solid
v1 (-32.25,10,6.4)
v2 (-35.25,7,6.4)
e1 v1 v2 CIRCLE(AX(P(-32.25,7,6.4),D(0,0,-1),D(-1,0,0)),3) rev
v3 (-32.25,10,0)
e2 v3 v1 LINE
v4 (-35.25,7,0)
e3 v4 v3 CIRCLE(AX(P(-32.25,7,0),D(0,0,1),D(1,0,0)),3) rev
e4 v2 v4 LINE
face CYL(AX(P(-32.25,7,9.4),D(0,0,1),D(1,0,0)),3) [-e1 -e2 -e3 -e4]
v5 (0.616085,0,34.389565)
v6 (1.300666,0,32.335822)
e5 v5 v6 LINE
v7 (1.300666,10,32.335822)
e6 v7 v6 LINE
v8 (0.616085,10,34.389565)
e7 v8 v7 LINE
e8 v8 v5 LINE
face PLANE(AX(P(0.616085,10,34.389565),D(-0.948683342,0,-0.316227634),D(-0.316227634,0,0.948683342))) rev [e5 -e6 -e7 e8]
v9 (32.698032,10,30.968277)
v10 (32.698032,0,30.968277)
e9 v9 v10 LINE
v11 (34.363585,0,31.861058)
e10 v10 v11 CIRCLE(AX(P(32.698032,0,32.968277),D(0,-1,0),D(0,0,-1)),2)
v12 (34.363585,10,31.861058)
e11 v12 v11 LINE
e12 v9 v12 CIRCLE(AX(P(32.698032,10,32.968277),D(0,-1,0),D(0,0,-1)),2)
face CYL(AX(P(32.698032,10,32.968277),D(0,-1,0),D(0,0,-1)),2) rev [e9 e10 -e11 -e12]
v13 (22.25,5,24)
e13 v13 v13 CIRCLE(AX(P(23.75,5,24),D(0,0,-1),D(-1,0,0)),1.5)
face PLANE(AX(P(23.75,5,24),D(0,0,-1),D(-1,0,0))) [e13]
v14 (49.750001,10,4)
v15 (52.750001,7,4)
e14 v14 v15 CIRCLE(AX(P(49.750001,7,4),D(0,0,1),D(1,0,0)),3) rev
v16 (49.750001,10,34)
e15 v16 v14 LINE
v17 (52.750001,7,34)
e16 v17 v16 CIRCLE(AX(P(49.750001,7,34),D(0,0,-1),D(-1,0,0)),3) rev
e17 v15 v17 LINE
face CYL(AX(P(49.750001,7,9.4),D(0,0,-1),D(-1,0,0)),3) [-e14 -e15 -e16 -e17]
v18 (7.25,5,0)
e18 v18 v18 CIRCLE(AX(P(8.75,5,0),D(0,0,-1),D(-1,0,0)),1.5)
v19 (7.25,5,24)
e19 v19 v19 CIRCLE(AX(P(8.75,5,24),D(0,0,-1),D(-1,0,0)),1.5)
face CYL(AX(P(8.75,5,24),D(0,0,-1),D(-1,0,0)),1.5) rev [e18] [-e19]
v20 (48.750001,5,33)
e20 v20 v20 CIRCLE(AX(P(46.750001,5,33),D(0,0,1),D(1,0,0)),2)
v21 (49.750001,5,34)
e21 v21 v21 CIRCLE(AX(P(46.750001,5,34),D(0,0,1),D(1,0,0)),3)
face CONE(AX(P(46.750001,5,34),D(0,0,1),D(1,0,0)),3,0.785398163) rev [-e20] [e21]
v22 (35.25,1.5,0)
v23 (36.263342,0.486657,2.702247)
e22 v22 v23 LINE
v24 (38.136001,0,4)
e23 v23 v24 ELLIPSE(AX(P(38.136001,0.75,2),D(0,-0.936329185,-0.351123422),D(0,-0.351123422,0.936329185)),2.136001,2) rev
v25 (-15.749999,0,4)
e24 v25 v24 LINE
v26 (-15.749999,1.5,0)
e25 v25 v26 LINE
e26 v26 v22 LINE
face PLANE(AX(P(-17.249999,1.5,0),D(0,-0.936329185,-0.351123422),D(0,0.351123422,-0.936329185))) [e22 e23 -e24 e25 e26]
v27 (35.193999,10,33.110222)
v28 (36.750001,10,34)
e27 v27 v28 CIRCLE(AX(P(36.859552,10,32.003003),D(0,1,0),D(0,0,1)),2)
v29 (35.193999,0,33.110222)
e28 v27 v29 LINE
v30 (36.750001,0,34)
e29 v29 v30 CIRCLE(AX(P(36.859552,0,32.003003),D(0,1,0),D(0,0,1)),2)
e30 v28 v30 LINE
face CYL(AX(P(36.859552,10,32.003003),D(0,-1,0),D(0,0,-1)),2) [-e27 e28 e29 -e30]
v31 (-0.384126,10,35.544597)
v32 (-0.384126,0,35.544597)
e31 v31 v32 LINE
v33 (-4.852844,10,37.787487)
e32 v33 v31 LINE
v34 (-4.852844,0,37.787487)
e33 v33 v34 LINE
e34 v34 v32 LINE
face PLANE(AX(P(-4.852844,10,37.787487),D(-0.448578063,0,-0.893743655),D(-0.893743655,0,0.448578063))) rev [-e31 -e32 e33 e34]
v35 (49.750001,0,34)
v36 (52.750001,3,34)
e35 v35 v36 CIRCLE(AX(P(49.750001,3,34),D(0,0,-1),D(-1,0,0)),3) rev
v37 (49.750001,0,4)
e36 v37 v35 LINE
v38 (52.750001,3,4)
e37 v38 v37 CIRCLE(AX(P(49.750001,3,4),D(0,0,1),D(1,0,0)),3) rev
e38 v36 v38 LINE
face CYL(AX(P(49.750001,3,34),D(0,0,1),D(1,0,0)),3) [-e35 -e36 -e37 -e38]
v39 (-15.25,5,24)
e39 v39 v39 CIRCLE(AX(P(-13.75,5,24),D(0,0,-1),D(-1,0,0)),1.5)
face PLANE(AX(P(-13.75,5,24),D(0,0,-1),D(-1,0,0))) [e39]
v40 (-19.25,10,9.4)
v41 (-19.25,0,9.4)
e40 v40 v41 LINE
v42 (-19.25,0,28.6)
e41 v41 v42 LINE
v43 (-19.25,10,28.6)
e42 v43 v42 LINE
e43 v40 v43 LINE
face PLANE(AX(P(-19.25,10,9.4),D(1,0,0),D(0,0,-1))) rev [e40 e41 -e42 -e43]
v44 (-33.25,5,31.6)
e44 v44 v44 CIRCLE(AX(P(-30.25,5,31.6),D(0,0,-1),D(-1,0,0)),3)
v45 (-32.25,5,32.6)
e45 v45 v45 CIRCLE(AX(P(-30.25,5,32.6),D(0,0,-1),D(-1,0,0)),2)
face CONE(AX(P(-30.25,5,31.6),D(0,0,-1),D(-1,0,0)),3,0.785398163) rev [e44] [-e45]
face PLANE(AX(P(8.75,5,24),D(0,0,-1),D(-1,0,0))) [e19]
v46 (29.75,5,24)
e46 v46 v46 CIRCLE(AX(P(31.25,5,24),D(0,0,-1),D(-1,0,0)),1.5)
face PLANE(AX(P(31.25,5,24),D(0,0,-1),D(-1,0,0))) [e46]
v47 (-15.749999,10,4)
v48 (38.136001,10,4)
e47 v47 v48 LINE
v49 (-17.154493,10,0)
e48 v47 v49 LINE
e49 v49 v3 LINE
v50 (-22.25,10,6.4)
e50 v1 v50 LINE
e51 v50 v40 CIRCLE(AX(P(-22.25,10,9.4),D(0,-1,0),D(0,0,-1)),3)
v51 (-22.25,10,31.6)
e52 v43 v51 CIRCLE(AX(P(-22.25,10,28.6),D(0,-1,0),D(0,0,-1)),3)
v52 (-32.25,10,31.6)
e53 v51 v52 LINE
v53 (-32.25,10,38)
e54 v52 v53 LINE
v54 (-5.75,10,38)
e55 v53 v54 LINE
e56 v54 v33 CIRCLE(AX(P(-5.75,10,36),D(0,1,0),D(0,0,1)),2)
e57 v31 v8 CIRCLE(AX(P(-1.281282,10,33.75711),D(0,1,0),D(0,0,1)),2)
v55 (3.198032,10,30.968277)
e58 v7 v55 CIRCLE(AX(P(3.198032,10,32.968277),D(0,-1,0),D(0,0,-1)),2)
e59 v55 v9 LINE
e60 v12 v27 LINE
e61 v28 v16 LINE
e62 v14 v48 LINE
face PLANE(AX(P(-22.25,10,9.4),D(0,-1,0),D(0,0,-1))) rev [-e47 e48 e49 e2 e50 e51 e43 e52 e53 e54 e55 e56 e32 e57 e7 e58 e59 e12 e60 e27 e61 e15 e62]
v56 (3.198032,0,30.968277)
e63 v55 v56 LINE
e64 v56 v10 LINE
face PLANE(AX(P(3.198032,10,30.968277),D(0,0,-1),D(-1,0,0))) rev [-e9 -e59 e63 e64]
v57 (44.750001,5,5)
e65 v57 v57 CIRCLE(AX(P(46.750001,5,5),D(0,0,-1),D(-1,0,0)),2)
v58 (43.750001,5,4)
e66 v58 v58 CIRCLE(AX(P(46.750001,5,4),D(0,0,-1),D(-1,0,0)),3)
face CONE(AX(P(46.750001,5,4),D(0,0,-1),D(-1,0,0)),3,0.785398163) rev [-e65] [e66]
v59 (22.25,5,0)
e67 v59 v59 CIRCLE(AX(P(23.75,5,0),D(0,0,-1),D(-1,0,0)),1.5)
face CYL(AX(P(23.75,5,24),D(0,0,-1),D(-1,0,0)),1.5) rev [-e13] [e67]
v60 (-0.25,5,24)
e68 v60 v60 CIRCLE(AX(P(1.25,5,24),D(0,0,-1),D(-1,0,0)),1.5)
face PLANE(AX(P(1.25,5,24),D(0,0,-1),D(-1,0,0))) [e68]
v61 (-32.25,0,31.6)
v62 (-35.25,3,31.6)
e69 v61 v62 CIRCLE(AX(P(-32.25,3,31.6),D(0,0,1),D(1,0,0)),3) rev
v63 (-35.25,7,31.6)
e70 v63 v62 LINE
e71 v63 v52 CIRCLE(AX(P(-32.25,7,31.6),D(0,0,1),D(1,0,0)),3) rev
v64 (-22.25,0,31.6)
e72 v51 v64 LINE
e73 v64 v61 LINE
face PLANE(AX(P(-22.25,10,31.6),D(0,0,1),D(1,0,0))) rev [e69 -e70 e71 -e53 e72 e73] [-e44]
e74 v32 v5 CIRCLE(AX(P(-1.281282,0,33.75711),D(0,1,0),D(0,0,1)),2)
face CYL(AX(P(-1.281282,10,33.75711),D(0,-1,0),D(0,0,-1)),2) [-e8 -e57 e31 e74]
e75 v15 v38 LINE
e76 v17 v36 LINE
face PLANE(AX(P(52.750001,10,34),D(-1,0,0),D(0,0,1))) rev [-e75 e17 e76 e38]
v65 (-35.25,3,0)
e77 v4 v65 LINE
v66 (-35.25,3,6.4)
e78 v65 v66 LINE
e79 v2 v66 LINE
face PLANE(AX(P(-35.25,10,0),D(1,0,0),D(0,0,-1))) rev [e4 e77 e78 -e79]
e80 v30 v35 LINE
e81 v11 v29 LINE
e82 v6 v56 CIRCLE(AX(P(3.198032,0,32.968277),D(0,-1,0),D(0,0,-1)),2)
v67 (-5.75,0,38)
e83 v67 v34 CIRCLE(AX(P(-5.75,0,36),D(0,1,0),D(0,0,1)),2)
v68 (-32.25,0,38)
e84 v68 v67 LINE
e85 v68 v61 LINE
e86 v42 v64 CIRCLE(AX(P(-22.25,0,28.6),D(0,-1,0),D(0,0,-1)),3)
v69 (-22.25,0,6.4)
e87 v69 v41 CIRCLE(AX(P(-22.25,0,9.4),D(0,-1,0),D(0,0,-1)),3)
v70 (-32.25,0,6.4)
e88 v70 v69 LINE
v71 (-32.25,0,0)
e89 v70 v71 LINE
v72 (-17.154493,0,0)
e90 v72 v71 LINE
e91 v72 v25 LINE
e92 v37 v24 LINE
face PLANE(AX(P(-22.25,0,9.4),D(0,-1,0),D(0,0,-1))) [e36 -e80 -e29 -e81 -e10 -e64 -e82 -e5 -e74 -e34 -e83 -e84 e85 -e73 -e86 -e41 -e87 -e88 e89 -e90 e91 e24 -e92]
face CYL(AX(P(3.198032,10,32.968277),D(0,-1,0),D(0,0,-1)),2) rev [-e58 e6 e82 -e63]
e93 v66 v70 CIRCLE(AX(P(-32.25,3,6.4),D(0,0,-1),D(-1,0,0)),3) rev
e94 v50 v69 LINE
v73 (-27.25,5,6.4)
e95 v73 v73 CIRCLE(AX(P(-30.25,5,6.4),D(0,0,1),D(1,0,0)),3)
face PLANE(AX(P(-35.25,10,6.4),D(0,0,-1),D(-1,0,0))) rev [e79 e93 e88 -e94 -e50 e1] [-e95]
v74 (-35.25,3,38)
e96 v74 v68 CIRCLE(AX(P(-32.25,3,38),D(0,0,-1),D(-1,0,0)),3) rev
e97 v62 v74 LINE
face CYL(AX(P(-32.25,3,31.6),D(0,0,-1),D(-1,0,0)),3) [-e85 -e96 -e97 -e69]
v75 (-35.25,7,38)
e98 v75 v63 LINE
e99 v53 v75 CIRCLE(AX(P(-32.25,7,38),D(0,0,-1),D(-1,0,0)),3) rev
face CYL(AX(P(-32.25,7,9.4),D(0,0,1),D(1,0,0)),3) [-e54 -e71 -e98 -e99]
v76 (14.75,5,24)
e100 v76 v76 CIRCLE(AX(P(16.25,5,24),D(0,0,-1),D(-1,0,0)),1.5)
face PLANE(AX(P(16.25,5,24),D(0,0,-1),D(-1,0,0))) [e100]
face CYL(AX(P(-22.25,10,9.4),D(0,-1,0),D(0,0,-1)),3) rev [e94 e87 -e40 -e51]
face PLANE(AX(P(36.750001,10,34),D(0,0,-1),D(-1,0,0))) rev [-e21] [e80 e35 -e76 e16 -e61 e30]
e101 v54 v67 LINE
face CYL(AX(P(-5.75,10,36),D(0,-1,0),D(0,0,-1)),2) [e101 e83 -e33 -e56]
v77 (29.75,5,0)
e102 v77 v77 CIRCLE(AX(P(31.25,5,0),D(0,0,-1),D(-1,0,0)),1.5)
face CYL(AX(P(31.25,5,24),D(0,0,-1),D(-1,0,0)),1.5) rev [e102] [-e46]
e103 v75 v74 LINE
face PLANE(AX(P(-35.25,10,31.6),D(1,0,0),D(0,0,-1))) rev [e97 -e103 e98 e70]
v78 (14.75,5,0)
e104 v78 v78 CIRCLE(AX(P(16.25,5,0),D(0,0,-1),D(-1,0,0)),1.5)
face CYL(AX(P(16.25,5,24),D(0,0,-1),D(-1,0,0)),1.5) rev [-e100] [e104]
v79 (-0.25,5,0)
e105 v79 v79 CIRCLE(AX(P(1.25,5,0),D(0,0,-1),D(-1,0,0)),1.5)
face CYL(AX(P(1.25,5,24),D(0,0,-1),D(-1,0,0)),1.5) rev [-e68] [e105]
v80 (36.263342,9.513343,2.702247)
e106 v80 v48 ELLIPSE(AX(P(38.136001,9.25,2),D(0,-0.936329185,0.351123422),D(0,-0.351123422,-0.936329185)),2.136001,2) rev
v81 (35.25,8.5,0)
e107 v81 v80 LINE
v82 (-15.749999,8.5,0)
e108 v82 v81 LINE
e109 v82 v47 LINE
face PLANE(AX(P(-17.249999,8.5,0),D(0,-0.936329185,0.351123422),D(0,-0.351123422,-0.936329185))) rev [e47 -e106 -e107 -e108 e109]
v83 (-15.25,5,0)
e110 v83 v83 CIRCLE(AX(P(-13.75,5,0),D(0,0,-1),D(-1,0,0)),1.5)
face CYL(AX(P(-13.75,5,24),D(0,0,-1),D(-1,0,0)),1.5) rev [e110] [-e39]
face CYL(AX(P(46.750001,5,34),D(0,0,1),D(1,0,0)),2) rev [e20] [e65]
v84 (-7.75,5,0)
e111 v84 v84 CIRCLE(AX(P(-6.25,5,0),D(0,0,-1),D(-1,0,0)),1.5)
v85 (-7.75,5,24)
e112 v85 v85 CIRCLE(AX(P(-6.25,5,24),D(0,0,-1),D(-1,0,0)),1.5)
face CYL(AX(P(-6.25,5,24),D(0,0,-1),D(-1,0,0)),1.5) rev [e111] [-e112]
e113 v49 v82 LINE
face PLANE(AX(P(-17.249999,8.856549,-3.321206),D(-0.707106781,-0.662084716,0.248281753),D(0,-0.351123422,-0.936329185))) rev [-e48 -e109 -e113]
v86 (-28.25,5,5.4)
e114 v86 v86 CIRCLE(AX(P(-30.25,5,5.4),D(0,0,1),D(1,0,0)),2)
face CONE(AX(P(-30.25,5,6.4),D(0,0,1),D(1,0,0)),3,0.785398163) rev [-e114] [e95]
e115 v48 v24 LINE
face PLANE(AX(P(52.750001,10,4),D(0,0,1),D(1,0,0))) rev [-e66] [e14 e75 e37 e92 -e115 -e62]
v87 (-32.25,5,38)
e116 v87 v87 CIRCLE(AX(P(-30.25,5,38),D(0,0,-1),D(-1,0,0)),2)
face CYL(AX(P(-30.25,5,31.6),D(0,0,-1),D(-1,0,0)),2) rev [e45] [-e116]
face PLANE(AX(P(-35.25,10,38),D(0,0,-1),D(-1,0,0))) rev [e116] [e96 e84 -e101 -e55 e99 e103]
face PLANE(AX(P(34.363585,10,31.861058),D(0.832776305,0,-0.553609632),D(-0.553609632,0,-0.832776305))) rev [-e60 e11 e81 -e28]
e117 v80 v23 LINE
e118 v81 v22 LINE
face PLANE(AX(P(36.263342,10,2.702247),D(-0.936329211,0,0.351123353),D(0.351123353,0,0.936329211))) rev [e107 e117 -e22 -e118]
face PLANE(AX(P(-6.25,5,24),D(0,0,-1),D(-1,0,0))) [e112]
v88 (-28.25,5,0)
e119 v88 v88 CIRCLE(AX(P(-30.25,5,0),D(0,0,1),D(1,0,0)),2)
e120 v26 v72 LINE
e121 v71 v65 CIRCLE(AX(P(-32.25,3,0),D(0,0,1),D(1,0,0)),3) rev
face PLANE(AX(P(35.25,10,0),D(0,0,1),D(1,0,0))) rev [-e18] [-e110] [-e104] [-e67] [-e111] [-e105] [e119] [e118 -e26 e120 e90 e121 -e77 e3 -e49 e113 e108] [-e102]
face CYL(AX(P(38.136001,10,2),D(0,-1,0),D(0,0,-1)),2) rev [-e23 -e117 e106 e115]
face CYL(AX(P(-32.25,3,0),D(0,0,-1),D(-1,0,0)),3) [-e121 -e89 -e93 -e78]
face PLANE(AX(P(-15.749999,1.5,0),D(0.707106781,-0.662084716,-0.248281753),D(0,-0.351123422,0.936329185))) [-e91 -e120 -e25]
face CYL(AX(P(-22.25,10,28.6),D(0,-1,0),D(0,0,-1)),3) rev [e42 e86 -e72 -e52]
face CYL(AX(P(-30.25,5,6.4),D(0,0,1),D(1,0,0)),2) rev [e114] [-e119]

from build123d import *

# Parameters (mm, degrees)
BOSS_EXTRUDE1_DEPTH           = 10
FILLET1_R                     = 3
CUT_EXTRUDE1_DEPTH            = 55.386
CHAMFER1_SIZE                 = 1.5
MIRROR3_START                 = -3.745316975
MIRROR3_DEPTH                 = 4.272002108
CSK_FOR_M4_SFHCS1_D           = 4
CSK_FOR_M4_SFHCS1_DEPTH       = 6.4
CSK_FOR_M4_SFHCS1_CSINK_D     = 6
CSK_FOR_M4_SFHCS1_CSINK_ANGLE = 90
CSK_FOR_M4_SFHCS2_D           = 4
CSK_FOR_M4_SFHCS2_CSINK_D     = 6
CSK_FOR_M4_SFHCS2_CSINK_ANGLE = 90
SKETCH7_R                     = 1.5
CUT_EXTRUDE2_DEPTH            = 24


# Read off the part's stored shape, not the designer's step: Mirror3
with BuildPart() as part:
    # Sketch1 → Boss-Extrude1 (new body)
    with BuildSketch(Plane(origin=(0, 0, 0), x_dir=(1, 0, 0), z_dir=(0, 1, 0))):
        with BuildLine():
            Line((-35.25, 0), (-35.25, -6.4))
            Line((-35.25, -6.4), (-22.25, -6.4))
            ThreePointArc((-22.25, -6.4), (-20.128679656, -7.278679656), (-19.25, -9.4))
            Line((-19.25, -9.4), (-19.25, -28.6))
            ThreePointArc((-19.25, -28.6), (-20.128679656, -30.721320344), (-22.25, -31.6))
            Line((-22.25, -31.6), (-35.25, -31.6))
            Line((-35.25, -31.6), (-35.25, -38))
            Line((-35.25, -38), (-5.75, -38))
            ThreePointArc((-5.75, -38), (-5.289009014, -37.946146786), (-4.852843875, -37.787487311))
            Line((-4.852843875, -37.787487311), (-0.384125597, -35.544596998))
            ThreePointArc((-0.384125597, -35.544596998), (0.230625744, -35.066359782), (0.616084961, -34.389564956))
            Line((0.616084961, -34.389564956), (1.30066574, -32.33582167))
            ThreePointArc((1.30066574, -32.33582167), (2.028611742, -31.34579265), (3.198032424, -30.968276939))
            Line((3.198032424, -30.968276939), (32.698032424, -30.968276939))
            ThreePointArc((32.698032424, -30.968276939), (33.642903174, -31.205546312), (34.363585035, -31.861057674))
            Line((34.363585035, -31.861057674), (35.193999483, -33.110222133))
            ThreePointArc((35.193999483, -33.110222133), (35.866740637, -33.73918414), (36.750000973, -34.000000252))
            Line((36.750000973, -34.000000252), (52.750000973, -34.000000252))
            Line((52.750000973, -34.000000252), (52.750000973, -4.000000252))
            Line((52.750000973, -4.000000252), (38.13600074, -4.000000252))
            ThreePointArc((38.13600074, -4.000000252), (36.996810987, -3.643851433), (36.263342318, -2.702246958))
            Line((36.263342318, -2.702246958), (35.25, 0))
            Line((35.25, 0), (-35.25, 0))
        make_face()
    extrude(amount=BOSS_EXTRUDE1_DEPTH)

    # Fillet1
    fillet1_edges = [part.edges().sort_by_distance(p)[0] for p in [
        (52.750000973, 0, 19.000000252),
        (-35.25, 0, 34.8),
        (-35.25, 0, 3.2),
        (-35.25, 10, 34.8),
        (52.750000973, 10, 19.000000252),
        (-35.25, 10, 3.2),
    ]]
    fillet(fillet1_edges, radius=FILLET1_R)

    # Sketch2 → Cut-Extrude1 (cut)
    with BuildSketch(Plane(origin=(38.13600074, 0, 0), x_dir=(0, 0, -1), z_dir=(1, 0, 0))):
        Polygon((-4.000000252, 10), (0, 10), (0, 8.5), align=None)
    extrude(amount=-CUT_EXTRUDE1_DEPTH, mode=Mode.SUBTRACT)

    # Chamfer1
    # the kernel refuses this chamfer: 1.5 mm, written as the material it adds along each edge
    with BuildSketch(Plane(origin=(-17.24999926, 7.145532803, -3.611912754), x_dir=(-0.027495876610586757, 0.9359751746095561, -0.35099066837171944), z_dir=(0, 0.3511234221997007, 0.9363291848398034))) as chamfer1_piece_1_section:
        Polygon((CHAMFER1_SIZE * 0.999621916911, -CHAMFER1_SIZE * 0.0274958766106), (-CHAMFER1_SIZE * 0.0274958766106, -CHAMFER1_SIZE * 0.999621916911), (0, 0), align=None)
    chamfer1_piece_1 = extrude(amount=11.987051072, mode=Mode.PRIVATE)
    chamfer1_piece_1 = split(chamfer1_piece_1, bisect_by=Plane(origin=(-16.68097762, 9.443284972, 0), z_dir=(0, 0, 1)), keep=Keep.TOP, mode=Mode.PRIVATE)
    chamfer1_piece_1 = split(chamfer1_piece_1, bisect_by=Plane(origin=(-16.68097762, 10, 1.484573502), z_dir=(0, -1, 0)), keep=Keep.TOP, mode=Mode.PRIVATE)
    add(chamfer1_piece_1)

    # Mirror3 outline → Mirror3 (cut)
    with BuildSketch(Plane(origin=(0, 0, 0), x_dir=(1, 0, 0), z_dir=(0, 0.3511234221997011, -0.9363291848398033)).offset(MIRROR3_START)):
        Polygon((-15.74999926, -1.404493777), (40, -1.404493777), (40, 2), (-19, 2), (-19, 1.845506963), align=None)
    extrude(amount=MIRROR3_DEPTH, mode=Mode.SUBTRACT)

    # CSK for M4 SFHCS1
    with Locations(Plane.XY.offset(6.4)):
        with Locations((-30.25, 5)):
            csk_for_m4_sfhcs1 = CounterSinkHole(CSK_FOR_M4_SFHCS1_D / 2, CSK_FOR_M4_SFHCS1_CSINK_D / 2, depth=CSK_FOR_M4_SFHCS1_DEPTH, counter_sink_angle=CSK_FOR_M4_SFHCS1_CSINK_ANGLE)

    # Mirror1: CSK for M4 SFHCS1 across plane
    add(csk_for_m4_sfhcs1.mirror(Plane.XY.offset(19)), mode=Mode.SUBTRACT)

    # CSK for M4 SFHCS2 (through all)
    with Locations(Plane.XY.offset(34.000000252)):
        with Locations((46.750000973, 5)):
            csk_for_m4_sfhcs2 = CounterSinkHole(CSK_FOR_M4_SFHCS2_D / 2, CSK_FOR_M4_SFHCS2_CSINK_D / 2, counter_sink_angle=CSK_FOR_M4_SFHCS2_CSINK_ANGLE)

    # Mirror2: CSK for M4 SFHCS2 across plane
    add(csk_for_m4_sfhcs2.mirror(Plane.XY.offset(19)), mode=Mode.SUBTRACT)

    # Sketch7 → Cut-Extrude2 (cut)
    with BuildSketch(Plane(origin=(0, 0, 0), x_dir=(-1, 0, 0), z_dir=(0, 0, -1))):
        with Locations((-31.25, 5)):
            Circle(SKETCH7_R)
        with Locations((-23.75, 5)):
            Circle(SKETCH7_R)
        with Locations((-16.25, 5)):
            Circle(SKETCH7_R)
        with Locations((-8.75, 5)):
            Circle(SKETCH7_R)
        with Locations((-1.25, 5)):
            Circle(SKETCH7_R)
        with Locations((6.25, 5)):
            Circle(SKETCH7_R)
        with Locations((13.75, 5)):
            Circle(SKETCH7_R)
    extrude(amount=-CUT_EXTRUDE2_DEPTH, mode=Mode.SUBTRACT)


solid = part.part
